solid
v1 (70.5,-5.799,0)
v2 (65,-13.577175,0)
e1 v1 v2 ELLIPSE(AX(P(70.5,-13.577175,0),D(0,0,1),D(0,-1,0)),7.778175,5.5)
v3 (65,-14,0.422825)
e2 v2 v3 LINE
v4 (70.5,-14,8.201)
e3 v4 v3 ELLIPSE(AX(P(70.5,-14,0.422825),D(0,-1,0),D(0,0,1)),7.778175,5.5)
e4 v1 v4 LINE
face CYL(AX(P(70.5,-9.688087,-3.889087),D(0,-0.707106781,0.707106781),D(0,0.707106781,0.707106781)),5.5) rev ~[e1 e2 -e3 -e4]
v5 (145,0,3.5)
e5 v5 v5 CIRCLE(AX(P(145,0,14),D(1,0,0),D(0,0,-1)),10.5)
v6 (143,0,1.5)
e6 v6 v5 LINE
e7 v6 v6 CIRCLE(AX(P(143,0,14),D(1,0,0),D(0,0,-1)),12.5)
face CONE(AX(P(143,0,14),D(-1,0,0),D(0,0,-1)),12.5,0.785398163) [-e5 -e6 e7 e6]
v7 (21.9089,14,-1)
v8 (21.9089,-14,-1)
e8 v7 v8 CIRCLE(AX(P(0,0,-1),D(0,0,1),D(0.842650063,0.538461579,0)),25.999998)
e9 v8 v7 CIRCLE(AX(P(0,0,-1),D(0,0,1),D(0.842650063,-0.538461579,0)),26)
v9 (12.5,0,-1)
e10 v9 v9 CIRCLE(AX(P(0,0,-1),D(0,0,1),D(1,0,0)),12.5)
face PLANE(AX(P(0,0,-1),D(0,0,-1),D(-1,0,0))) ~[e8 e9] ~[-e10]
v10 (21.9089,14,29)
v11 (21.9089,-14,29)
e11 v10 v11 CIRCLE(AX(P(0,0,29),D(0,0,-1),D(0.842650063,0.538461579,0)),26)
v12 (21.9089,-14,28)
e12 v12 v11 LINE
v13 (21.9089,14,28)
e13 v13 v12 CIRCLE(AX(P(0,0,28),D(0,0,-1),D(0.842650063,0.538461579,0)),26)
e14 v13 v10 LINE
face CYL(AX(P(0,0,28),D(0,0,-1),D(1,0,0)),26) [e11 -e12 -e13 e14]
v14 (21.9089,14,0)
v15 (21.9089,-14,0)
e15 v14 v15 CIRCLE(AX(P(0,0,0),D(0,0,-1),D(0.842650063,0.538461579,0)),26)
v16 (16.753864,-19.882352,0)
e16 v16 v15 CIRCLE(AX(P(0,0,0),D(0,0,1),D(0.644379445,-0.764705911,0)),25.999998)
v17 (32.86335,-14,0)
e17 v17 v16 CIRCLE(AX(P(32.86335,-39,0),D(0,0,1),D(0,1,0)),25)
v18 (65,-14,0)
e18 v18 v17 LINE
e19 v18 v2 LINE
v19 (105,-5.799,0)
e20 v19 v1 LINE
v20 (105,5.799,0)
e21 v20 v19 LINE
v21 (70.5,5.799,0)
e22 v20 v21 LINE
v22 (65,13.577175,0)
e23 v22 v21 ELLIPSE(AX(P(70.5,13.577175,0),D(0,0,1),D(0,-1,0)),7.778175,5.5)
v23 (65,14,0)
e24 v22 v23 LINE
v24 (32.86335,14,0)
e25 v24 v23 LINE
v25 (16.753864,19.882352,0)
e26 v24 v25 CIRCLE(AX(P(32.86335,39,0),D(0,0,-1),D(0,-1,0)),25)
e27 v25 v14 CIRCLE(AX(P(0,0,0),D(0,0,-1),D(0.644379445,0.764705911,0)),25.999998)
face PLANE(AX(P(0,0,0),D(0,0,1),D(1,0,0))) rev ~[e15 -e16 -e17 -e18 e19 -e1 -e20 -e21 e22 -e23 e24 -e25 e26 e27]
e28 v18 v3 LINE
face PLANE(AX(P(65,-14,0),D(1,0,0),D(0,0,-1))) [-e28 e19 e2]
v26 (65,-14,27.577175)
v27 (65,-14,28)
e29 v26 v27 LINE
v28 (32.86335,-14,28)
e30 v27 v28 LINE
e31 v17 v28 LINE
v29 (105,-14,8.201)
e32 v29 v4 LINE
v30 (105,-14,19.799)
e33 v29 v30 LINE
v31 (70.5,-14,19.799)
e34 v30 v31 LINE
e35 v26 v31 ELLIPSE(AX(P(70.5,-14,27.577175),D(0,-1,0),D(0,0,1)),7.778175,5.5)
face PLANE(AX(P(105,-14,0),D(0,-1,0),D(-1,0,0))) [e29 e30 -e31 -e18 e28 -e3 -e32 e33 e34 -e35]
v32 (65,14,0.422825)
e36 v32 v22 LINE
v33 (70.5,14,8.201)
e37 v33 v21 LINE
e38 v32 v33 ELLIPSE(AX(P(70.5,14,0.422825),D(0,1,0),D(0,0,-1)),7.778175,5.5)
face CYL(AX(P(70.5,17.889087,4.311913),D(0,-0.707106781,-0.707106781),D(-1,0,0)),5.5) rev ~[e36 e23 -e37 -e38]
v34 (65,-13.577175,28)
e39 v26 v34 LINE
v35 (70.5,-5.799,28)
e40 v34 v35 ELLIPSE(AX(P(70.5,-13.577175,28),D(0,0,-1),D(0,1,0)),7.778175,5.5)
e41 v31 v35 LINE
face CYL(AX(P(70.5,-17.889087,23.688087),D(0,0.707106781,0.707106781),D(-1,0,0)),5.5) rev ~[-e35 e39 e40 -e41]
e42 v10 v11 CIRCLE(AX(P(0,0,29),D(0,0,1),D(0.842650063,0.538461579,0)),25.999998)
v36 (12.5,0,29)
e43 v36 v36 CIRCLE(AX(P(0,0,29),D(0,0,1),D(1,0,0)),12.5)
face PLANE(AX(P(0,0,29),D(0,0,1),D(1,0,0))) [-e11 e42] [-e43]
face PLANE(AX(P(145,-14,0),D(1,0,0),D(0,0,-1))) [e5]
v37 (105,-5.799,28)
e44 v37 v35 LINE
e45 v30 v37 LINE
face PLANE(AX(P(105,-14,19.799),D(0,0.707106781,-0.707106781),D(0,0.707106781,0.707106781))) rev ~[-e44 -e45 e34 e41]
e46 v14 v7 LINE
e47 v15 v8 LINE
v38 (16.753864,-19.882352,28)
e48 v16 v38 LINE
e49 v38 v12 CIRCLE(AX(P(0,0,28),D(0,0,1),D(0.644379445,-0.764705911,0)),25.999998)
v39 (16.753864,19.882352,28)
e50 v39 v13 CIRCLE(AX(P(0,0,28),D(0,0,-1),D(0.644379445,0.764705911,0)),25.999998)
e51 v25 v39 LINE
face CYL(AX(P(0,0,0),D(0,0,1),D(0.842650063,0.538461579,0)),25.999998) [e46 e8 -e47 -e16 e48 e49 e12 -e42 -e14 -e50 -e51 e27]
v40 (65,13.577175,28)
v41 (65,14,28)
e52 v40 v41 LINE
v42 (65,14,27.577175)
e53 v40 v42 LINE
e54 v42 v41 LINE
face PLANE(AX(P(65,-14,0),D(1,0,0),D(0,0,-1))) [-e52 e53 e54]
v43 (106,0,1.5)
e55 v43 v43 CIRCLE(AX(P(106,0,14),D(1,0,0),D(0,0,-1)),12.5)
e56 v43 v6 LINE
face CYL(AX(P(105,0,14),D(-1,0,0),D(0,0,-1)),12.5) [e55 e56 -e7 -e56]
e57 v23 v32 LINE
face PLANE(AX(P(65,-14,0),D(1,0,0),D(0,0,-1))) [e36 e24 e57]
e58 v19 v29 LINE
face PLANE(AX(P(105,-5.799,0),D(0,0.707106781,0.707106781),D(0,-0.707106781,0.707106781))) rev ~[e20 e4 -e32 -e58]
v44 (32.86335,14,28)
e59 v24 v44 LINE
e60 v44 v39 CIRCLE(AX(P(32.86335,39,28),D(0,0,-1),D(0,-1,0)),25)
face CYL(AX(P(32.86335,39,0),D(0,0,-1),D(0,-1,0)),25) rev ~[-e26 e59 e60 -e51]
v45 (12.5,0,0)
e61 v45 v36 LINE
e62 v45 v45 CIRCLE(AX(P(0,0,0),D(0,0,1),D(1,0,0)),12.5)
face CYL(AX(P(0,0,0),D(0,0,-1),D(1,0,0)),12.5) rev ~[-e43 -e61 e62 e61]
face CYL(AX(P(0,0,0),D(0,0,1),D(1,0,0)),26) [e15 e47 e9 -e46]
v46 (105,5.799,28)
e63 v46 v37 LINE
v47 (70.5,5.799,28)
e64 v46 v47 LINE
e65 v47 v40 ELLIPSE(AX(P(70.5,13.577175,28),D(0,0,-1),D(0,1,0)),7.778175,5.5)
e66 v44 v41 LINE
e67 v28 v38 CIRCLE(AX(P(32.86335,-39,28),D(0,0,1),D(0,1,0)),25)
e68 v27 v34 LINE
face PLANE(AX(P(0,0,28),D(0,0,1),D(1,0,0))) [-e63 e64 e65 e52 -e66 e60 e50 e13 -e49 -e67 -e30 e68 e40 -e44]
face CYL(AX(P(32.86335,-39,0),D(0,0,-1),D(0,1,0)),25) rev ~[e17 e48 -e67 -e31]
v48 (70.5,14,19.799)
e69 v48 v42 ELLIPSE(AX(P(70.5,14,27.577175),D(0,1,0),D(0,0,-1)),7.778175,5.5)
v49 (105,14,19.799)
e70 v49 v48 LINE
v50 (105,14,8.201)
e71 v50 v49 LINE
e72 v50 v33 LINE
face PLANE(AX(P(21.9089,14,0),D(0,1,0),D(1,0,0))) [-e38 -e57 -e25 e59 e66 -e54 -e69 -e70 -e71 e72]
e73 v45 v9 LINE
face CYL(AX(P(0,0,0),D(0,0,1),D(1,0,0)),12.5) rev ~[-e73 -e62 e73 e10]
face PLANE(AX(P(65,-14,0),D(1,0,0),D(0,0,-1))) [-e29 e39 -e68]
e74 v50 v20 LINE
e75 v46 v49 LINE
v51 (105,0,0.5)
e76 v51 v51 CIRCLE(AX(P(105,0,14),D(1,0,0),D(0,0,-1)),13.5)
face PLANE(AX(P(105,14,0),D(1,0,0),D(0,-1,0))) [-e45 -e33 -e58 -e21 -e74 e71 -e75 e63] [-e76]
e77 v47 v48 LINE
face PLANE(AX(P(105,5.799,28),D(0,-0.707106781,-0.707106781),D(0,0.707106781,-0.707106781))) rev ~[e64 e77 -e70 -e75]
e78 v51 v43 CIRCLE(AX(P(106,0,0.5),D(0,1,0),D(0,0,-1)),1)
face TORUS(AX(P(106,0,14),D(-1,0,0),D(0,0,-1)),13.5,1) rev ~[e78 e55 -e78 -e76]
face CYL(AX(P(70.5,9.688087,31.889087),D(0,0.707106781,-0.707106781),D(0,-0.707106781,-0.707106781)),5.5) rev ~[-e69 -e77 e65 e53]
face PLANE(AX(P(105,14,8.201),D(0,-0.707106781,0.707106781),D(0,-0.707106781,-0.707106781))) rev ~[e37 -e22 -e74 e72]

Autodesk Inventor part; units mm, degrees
ref_plane "YZ Plane" through (0, 0, 0) normal (1, 0, 0) x (0, 1, 0)
ref_plane "XZ Plane" through (0, 0, 0) normal (0, 1, 0) x (-1, 0, 0)
sketch "Sketch1" plane through (0, 0, 0) normal (0, 0, 1) x (1, 0, 0)
  arc A0 (21.9089, 14) -> (21.9089, -14) centre (0, 0) ccw
  circle A1 centre (0, 0) radius 12.5
  line L0 (21.9089, 14) -> (105, 14)
  line L1 (105, 14) -> (105, -14)
  line L2 (105, -14) -> (21.9089, -14)
  line L3 (-36.8957, 0) -> (84.4086, 0)
  dimension "d0" = 52
  dimension "d1" = 25
  dimension "d2" = 28
  dimension "d3" = 105
extrude "Extrusion1" add sketch "Sketch1" along normal blind 28
sketch "Sketch2" plane through (0, 0, 28) normal (0, 0, 1) x (1, 0, 0)
  arc A0 (21.9089, 14) -> (21.9089, -14) centre (0, 0) ccw projected
  circle A1 centre (0, 0) radius 26
  circle A2 centre (0, 0) radius 12.5 projected
  point P0 (21.9089, -14)
extrude "Extrusion2" add sketch "Sketch2" along normal blind 1
ref_plane "Work Plane1" through (0, 0, 14) normal (0, 0, 1) x (1, 0, 0)
mirror "Mirror2" about plane through (0, 0, 14) normal (0, 0, 1) of "Extrusion2"
sketch "Sketch3" plane through (105, -14, 0) normal (1, 0, 0) x (0, 0, -1)
  circle A0 centre (-14, 14) radius 12.5
  line L0 (0, 0) -> (0, 28) projected
  line L1 (0, 28) -> (-28, 28) projected
  point P0 (0, 14)
  point P1 (0, 14)
  point P2 (-14, 28)
  dimension "d8" = 25
extrude "Extrusion3" add sketch "Sketch3" along normal blind 40
sketch "Sketch4" plane through (105, -14, 0) normal (1, 0, 0) x (0, 0, -1)
  circle A0 centre (-14, 14) radius 12.5 projected
  line L0 (0, 0) -> (-28, 0) projected
  line L1 (-8.201, 0) -> (-19.799, 0)
  line L2 (-19.799, 0) -> (-28, 8.201)
  line L3 (-28, 8.201) -> (-28, 19.799)
  line L4 (-28, 19.799) -> (-19.799, 28)
  line L5 (-19.799, 28) -> (-8.201, 28)
  line L6 (-8.201, 28) -> (0, 19.799)
  line L7 (0, 19.799) -> (0, 8.201)
  line L8 (0, 8.201) -> (-8.201, 0)
  circle A1 centre (-14, 14) radius 12.5 projected
  line L9 (0, 0) -> (0, 28) projected
  line L10 (0, 28) -> (-28, 28) projected
  line L11 (-28, 0) -> (-28, 28) projected
  line L12 (0, 0) -> (-28, 0) projected
  point P0 (0, 14)
  point P1 (0, 8.201)
extrude "Extrusion4" cut sketch "Sketch4" against normal blind 40 contours L0 L8 L9 | L0 L11 L2 | L6 L10 L9 | L11 L10 L4
fillet "Fillet1" radius 5.5 4 edges at (65, 9.8995, 23.8995) (65, 9.8995, 4.1005) (65, -9.8995, 4.1005) (65, -9.8995, 23.8995)
fillet "Fillet2" radius 25 2 edges at (21.9089, 14, 14) (21.9089, -14, 14)
fillet "Fillet3" radius 1 1 edges at (105, 0, 26.5)
chamfer "Chamfer1" distance 2 angle 45 1 edges at (145, 0, 26.5)
properties part number "eye-end" material "Steel, Alloy"
